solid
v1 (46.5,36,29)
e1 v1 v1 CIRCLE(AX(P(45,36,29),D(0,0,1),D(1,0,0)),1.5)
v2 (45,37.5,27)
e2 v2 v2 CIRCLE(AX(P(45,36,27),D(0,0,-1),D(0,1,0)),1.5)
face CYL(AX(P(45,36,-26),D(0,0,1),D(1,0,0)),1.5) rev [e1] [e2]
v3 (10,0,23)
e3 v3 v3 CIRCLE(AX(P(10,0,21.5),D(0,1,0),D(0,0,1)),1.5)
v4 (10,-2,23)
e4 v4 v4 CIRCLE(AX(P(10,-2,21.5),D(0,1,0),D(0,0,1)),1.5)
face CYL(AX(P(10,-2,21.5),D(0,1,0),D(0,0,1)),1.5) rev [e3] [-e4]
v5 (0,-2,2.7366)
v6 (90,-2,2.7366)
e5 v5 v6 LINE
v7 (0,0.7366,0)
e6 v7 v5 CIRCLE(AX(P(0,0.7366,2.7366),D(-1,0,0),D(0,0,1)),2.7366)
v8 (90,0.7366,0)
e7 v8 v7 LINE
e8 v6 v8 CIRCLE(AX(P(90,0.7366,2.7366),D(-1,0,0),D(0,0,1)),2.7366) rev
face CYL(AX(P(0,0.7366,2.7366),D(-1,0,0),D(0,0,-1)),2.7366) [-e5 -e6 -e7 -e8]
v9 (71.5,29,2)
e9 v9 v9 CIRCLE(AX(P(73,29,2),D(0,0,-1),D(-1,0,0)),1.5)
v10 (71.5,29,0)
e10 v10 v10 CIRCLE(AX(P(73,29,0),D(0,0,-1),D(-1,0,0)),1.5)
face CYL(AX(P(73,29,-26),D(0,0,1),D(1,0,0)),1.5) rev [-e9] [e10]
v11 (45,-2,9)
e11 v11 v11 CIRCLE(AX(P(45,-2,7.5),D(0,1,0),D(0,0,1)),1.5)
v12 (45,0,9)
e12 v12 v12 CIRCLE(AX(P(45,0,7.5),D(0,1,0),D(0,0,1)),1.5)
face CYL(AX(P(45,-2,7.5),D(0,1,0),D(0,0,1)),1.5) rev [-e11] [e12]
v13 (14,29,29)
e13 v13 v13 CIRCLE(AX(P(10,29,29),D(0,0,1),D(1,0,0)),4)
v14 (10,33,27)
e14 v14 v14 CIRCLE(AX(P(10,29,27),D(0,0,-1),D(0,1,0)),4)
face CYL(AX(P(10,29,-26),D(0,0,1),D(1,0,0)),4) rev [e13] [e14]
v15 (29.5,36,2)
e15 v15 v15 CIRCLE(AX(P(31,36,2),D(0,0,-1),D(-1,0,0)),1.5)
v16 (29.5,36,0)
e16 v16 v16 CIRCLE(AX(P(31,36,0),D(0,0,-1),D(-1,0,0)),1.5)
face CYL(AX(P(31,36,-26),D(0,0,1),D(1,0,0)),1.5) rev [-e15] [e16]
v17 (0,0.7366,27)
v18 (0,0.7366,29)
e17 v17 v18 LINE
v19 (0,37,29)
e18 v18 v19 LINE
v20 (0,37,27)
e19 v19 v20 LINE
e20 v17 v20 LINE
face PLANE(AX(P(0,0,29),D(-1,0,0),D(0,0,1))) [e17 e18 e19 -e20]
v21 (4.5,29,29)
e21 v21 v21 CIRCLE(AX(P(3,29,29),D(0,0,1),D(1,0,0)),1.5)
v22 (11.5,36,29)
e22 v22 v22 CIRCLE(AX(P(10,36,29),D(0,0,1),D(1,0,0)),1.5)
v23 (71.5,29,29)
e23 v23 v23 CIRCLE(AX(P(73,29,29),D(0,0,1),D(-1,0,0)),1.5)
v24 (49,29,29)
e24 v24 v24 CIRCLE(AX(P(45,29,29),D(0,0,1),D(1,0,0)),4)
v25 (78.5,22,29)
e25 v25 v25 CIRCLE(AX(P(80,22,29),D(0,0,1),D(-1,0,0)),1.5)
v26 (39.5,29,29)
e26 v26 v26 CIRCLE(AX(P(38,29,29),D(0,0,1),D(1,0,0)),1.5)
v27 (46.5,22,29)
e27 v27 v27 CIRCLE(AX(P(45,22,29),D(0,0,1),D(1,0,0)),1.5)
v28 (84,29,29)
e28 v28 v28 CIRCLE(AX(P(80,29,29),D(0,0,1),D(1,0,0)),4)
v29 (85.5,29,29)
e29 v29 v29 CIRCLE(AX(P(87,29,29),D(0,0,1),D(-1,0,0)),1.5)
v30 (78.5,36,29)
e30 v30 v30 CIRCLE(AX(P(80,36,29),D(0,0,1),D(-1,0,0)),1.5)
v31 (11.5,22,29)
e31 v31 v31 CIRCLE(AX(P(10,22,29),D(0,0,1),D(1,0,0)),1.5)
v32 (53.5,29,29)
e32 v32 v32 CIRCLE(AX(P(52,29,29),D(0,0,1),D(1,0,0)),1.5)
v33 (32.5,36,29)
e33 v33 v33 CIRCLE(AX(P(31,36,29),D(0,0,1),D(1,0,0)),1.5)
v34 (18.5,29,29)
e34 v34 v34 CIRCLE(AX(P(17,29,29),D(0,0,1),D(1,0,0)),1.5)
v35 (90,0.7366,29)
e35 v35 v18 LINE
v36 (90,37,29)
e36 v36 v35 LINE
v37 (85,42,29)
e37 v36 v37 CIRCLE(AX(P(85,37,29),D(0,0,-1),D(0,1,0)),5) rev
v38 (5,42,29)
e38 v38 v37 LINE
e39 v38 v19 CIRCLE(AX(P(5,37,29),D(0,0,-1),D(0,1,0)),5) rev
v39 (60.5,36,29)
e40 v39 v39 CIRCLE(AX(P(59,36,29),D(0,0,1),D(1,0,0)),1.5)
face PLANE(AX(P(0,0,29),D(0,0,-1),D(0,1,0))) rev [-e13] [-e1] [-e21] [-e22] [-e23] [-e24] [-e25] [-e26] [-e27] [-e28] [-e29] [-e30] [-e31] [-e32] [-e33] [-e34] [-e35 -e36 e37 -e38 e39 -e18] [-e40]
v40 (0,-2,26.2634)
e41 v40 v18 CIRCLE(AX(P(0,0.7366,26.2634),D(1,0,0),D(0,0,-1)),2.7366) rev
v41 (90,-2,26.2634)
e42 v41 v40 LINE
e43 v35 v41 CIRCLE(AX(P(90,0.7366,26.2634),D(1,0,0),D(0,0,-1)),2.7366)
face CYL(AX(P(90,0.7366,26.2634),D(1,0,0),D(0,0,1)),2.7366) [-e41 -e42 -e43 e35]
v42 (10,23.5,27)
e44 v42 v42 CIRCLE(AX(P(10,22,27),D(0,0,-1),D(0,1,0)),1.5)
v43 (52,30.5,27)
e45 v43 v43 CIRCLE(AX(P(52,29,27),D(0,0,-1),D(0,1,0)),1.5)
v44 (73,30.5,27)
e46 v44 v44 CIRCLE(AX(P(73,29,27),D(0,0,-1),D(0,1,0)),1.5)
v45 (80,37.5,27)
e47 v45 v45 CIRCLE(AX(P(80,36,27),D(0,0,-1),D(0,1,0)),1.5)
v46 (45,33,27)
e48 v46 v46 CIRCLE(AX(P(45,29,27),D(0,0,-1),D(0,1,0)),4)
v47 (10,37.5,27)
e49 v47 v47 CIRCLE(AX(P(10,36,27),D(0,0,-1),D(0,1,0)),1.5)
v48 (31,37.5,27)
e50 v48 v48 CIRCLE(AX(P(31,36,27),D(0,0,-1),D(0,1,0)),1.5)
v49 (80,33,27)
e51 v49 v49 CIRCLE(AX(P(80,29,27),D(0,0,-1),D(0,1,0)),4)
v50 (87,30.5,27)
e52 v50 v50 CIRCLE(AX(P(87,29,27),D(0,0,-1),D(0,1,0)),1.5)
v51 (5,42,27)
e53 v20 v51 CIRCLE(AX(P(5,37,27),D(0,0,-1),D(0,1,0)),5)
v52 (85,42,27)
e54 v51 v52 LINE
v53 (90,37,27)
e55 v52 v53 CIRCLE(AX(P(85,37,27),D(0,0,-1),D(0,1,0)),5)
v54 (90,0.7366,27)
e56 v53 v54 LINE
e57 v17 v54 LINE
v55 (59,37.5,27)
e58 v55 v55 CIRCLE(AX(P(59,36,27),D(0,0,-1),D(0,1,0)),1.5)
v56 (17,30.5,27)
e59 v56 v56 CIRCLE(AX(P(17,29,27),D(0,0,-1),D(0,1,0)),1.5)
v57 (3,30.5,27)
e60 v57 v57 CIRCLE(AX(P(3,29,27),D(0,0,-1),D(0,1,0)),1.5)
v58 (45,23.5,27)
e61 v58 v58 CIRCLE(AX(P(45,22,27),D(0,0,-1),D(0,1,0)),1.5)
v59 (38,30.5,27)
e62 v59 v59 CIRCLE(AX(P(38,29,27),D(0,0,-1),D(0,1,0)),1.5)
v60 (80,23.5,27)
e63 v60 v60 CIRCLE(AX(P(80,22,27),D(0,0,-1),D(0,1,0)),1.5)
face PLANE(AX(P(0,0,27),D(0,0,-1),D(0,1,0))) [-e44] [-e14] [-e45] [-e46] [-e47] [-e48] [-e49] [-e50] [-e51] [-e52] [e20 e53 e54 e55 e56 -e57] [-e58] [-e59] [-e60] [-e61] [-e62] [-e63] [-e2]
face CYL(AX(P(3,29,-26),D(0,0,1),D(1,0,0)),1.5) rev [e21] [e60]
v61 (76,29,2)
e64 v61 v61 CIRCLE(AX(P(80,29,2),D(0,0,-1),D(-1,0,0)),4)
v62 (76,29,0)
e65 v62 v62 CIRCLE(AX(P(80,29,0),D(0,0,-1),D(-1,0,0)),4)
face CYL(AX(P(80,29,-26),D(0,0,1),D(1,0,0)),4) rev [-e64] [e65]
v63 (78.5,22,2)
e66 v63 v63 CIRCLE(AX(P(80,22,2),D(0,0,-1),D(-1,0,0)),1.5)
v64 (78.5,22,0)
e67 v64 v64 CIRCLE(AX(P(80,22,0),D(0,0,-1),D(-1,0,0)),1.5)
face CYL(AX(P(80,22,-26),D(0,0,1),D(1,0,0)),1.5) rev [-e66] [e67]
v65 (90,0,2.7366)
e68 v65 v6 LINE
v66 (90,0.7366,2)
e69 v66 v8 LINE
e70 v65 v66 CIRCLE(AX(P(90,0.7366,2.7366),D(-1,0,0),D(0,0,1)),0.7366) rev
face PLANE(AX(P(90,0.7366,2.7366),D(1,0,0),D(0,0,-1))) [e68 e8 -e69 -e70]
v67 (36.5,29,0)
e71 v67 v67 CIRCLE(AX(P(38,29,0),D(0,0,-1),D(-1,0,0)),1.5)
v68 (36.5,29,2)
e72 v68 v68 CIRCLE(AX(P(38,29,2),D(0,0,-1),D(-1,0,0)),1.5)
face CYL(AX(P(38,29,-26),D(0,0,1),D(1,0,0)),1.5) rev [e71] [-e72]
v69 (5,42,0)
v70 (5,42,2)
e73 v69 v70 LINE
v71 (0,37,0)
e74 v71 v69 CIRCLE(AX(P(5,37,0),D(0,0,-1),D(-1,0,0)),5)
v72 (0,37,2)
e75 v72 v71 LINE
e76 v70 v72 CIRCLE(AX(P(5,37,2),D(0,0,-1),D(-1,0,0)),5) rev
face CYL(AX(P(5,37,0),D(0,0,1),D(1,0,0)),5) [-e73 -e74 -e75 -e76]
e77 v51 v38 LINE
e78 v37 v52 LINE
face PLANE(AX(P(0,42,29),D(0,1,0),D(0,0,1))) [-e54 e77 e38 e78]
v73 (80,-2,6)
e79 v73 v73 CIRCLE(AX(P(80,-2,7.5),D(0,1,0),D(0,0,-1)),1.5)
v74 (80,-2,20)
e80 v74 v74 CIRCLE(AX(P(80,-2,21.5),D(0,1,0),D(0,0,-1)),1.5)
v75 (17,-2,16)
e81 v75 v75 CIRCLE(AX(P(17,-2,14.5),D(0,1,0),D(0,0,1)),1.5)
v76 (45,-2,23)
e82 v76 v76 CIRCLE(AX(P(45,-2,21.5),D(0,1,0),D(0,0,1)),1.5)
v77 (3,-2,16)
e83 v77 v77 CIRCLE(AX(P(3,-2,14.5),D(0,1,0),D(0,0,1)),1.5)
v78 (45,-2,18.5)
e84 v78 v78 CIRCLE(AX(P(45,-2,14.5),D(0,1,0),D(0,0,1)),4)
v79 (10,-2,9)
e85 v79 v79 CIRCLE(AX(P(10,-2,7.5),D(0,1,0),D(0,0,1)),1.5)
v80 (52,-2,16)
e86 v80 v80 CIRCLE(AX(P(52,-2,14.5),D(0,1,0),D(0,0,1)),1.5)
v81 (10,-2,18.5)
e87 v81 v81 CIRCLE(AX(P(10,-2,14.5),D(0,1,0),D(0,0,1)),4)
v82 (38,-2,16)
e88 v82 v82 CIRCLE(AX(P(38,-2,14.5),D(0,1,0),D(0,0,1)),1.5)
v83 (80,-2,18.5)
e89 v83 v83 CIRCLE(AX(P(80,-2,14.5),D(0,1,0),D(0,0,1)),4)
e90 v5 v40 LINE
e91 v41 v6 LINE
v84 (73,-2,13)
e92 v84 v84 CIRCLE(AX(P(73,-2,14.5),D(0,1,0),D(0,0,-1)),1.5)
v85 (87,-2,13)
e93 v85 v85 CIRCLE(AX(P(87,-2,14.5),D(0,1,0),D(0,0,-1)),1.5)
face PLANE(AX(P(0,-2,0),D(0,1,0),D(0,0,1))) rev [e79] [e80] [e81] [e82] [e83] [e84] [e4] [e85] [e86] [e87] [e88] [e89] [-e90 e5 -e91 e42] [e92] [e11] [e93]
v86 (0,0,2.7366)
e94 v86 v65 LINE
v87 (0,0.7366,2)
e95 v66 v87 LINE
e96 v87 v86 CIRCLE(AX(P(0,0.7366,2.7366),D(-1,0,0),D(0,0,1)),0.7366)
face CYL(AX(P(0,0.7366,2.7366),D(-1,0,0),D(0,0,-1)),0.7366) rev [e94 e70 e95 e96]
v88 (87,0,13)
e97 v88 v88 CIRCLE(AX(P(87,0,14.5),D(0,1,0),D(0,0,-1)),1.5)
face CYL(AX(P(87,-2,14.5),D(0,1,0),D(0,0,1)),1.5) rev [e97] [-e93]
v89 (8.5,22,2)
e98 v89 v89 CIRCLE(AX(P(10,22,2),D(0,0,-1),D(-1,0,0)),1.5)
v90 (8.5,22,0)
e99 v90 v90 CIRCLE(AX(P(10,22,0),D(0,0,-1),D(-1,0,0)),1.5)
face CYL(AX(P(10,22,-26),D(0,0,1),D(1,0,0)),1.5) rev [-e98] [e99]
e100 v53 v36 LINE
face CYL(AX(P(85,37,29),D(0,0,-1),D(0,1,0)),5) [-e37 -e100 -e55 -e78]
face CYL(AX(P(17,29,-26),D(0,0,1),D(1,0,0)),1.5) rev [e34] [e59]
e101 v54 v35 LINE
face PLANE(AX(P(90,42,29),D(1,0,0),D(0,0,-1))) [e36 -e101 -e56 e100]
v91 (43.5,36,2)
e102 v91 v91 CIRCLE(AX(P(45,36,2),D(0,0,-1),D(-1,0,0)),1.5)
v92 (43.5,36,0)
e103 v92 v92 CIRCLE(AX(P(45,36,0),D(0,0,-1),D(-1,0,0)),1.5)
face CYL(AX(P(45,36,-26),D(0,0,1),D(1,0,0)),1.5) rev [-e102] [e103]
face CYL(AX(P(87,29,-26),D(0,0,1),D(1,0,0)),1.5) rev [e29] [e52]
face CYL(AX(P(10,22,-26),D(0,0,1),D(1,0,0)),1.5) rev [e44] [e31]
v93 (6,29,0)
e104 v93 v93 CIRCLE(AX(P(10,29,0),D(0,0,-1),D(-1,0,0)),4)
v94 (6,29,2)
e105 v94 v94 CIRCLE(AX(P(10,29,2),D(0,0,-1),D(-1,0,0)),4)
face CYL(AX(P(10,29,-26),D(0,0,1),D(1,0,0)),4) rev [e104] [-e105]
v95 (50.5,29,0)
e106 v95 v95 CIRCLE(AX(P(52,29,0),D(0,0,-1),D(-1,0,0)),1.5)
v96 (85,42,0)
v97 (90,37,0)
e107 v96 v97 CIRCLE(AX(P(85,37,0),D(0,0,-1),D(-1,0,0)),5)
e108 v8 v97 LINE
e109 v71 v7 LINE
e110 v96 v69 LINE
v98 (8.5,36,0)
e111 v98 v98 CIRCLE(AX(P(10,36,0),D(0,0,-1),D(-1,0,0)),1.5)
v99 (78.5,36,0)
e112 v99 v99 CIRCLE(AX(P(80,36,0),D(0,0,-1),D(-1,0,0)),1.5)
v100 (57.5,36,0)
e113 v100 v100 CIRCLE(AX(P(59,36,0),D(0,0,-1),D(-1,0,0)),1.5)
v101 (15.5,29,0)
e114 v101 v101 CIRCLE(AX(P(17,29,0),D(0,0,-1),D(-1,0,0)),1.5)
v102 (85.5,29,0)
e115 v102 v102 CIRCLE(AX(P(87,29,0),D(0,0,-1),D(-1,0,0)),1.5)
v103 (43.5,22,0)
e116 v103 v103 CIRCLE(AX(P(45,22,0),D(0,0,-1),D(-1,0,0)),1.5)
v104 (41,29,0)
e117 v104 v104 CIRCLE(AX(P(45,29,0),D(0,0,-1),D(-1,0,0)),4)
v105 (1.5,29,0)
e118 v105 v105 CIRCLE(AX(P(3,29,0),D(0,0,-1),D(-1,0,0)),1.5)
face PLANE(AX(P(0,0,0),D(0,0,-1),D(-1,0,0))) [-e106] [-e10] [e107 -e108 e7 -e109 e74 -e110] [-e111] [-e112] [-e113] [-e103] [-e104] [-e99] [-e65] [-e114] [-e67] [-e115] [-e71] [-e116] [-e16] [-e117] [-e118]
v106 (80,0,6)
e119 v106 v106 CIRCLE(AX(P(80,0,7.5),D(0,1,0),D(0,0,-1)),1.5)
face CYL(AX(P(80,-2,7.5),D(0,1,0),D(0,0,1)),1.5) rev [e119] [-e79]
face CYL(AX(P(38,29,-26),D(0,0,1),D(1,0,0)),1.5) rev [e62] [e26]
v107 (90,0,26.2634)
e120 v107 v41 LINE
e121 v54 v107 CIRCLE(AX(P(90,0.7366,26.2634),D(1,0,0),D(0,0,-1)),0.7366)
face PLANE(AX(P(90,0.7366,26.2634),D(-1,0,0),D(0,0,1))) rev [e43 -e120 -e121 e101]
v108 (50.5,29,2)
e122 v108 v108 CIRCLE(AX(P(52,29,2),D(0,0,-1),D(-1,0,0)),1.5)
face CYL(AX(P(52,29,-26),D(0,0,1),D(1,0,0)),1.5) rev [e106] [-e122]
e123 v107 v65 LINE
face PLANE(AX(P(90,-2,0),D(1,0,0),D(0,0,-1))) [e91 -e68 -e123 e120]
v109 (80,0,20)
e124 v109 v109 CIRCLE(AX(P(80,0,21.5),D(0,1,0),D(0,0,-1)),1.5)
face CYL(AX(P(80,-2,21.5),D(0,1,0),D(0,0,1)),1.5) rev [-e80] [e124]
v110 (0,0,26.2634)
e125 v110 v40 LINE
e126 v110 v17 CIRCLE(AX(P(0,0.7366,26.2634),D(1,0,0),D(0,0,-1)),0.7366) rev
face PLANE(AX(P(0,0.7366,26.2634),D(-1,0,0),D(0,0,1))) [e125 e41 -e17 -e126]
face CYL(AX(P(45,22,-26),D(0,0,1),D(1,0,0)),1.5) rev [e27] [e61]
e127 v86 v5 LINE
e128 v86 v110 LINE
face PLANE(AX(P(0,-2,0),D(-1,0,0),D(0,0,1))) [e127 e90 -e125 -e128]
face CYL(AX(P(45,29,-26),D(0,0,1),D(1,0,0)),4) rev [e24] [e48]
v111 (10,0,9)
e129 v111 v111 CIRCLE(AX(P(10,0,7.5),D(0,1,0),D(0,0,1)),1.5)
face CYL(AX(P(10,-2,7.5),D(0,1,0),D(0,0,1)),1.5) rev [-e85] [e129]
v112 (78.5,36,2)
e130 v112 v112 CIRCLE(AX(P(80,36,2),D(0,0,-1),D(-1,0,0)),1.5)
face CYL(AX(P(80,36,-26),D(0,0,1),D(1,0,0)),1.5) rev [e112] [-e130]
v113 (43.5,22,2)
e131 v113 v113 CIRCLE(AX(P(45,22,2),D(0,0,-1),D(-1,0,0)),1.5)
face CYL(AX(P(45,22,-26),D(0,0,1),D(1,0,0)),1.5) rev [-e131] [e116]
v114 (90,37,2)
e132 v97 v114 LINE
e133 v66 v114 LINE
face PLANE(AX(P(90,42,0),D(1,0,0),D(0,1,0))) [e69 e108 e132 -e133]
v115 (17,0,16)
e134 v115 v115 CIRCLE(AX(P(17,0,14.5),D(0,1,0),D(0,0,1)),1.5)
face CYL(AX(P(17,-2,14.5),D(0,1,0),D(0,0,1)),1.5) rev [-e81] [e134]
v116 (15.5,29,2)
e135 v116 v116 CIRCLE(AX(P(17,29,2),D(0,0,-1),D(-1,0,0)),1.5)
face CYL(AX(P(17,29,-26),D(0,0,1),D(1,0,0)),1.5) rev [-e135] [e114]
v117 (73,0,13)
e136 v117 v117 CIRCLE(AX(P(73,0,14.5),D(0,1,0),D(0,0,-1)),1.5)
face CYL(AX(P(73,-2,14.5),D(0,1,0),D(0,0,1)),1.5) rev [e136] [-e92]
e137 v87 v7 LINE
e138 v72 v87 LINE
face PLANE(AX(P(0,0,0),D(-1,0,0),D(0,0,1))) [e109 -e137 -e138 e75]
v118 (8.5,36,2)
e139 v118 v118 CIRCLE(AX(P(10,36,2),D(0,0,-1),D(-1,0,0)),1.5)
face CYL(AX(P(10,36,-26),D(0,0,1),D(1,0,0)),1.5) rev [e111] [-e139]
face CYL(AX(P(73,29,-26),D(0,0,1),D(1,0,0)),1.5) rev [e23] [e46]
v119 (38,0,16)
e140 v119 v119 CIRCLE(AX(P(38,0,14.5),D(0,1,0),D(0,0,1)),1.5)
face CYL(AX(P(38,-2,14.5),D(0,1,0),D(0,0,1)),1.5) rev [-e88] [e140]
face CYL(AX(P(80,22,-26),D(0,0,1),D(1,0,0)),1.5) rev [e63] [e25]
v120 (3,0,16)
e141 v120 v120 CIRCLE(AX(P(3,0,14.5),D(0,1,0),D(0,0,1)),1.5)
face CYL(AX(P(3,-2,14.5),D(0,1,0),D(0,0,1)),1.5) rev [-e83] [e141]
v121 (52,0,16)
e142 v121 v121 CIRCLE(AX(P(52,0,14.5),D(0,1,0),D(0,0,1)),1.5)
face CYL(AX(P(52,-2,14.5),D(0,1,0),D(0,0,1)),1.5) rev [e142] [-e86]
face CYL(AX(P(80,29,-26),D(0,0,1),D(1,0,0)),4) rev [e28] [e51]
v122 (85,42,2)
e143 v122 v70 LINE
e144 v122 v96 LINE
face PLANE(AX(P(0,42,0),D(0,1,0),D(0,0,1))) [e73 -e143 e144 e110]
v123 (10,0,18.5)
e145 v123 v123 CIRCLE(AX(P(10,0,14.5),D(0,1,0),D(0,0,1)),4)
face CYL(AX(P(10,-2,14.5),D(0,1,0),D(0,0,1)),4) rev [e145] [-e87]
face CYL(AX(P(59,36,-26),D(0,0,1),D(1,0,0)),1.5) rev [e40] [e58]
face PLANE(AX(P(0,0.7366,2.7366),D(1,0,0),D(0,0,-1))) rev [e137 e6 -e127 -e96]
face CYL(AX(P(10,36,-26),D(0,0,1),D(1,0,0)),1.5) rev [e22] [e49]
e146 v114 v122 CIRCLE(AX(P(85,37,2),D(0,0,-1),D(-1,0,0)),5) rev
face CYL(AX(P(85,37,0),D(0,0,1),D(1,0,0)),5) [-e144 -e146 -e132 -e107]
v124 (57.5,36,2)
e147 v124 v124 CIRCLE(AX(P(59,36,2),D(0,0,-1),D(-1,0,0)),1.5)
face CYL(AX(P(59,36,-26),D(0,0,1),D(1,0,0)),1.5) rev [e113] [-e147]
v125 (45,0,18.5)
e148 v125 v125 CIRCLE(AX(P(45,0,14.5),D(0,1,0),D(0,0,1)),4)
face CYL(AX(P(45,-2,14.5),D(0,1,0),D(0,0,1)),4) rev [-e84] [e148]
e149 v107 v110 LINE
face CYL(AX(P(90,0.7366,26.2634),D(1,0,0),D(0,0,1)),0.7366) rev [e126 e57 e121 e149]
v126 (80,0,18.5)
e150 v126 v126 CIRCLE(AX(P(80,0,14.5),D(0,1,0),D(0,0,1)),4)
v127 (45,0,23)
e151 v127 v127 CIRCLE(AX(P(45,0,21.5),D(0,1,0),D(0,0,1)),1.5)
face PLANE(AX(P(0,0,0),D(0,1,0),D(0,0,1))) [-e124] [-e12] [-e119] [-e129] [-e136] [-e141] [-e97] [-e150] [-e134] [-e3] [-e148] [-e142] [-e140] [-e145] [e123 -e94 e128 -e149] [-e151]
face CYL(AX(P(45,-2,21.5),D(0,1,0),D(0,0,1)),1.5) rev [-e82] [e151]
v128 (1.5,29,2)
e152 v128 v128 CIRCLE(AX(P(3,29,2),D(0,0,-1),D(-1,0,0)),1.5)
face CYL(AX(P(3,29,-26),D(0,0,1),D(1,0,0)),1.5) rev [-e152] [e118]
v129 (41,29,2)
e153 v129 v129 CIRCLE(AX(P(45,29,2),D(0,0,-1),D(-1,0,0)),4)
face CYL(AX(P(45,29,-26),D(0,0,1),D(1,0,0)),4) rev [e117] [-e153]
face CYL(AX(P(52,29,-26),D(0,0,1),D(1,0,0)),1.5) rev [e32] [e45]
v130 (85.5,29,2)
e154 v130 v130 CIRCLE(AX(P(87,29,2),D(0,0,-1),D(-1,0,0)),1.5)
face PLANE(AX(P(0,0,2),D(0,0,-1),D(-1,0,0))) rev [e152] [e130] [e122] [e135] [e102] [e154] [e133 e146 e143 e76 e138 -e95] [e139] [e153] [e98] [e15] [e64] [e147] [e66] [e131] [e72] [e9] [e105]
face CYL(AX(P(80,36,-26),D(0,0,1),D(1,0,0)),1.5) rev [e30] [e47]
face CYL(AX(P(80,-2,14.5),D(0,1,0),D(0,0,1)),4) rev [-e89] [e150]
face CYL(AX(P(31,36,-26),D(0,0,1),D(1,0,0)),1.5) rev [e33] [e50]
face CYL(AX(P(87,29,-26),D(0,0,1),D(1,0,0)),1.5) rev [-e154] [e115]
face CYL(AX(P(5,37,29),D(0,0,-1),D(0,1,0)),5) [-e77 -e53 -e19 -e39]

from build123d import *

# Parameters (mm, degrees)
SKETCH_1_W                         = 90
SKETCH_1_H                         = 29
SKETCH_1_R                         = 4
SKETCH_1_R_2                       = 1.5
SM_BASE_FLANGE_1_DEPTH             = 2
SM_EDGE_FLANGE_1_STRIP_W           = 9.4732
SM_EDGE_FLANGE_1_STRIP_H           = 2
SM_EDGE_FLANGE_1_STRIP_CUT_DEPTH   = 90
SM_EDGE_FLANGE_1_STRIP_2_W         = 9.4732
SM_EDGE_FLANGE_1_STRIP_2_H         = 2
SM_EDGE_FLANGE_1_STRIP_CUT_2_DEPTH = 90
SM_EDGE_FLANGE_1_DEPTH             = 90
SM_EDGE_FLANGE_1_BEND_DEPTH        = 90
SKETCH_12_R                        = 4
SKETCH_12_R_2                      = 1.5
CUT_EXTRUDE_1_DEPTH                = 55
FILLET_1_R                         = 5


# Sheet-metal steps are written as plain solids
with BuildPart() as part:
    # Sketch 1 → 基体-法兰1 (new body)
    with BuildSketch(Plane(origin=(0, 0, 0), x_dir=(1, 0, 0), z_dir=(0, 1, 0))):
        with Locations((45, -14.5)):
            Rectangle(SKETCH_1_W, SKETCH_1_H)
        with Locations(Location((45, -14.5, 0), (0, 0, 270))):
            Circle(SKETCH_1_R, mode=Mode.SUBTRACT)
        with Locations(Location((10, -14.5, 0), (0, 0, 270))):
            Circle(SKETCH_1_R, mode=Mode.SUBTRACT)
        with Locations(Location((80, -14.5, 0), (0, 0, 270))):
            Circle(SKETCH_1_R, mode=Mode.SUBTRACT)
        with Locations(Location((10, -7.5, 0), (0, 0, 270))):
            Circle(SKETCH_1_R_2, mode=Mode.SUBTRACT)
        with Locations(Location((10, -21.5, 0), (0, 0, 270))):
            Circle(SKETCH_1_R_2, mode=Mode.SUBTRACT)
        with Locations(Location((17, -14.5, 0), (0, 0, 270))):
            Circle(SKETCH_1_R_2, mode=Mode.SUBTRACT)
        with Locations(Location((3, -14.5, 0), (0, 0, 270))):
            Circle(SKETCH_1_R_2, mode=Mode.SUBTRACT)
        with Locations(Location((45, -7.5, 0), (0, 0, 270))):
            Circle(SKETCH_1_R_2, mode=Mode.SUBTRACT)
        with Locations(Location((45, -21.5, 0), (0, 0, 270))):
            Circle(SKETCH_1_R_2, mode=Mode.SUBTRACT)
        with Locations(Location((52, -14.5, 0), (0, 0, 270))):
            Circle(SKETCH_1_R_2, mode=Mode.SUBTRACT)
        with Locations(Location((38, -14.5, 0), (0, 0, 270))):
            Circle(SKETCH_1_R_2, mode=Mode.SUBTRACT)
        with Locations(Location((87, -14.5, 0), (0, 0, 90))):
            Circle(SKETCH_1_R_2, mode=Mode.SUBTRACT)
        with Locations(Location((80, -21.5, 0), (0, 0, 90))):
            Circle(SKETCH_1_R_2, mode=Mode.SUBTRACT)
        with Locations(Location((73, -14.5, 0), (0, 0, 90))):
            Circle(SKETCH_1_R_2, mode=Mode.SUBTRACT)
        with Locations(Location((80, -7.5, 0), (0, 0, 90))):
            Circle(SKETCH_1_R_2, mode=Mode.SUBTRACT)
    extrude(amount=-SM_BASE_FLANGE_1_DEPTH)

    # 边线-法兰1 strip (across the edge) → 边线-法兰1 strip cut (cut)
    with BuildSketch(Plane.ZY.offset(-90)):
        with Locations((-2, -1)):
            Rectangle(SM_EDGE_FLANGE_1_STRIP_W, SM_EDGE_FLANGE_1_STRIP_H)
    extrude(amount=SM_EDGE_FLANGE_1_STRIP_CUT_DEPTH, mode=Mode.SUBTRACT)

    # 边线-法兰1 strip 2 (across the edge) → 边线-法兰1 strip cut 2 (cut)
    with BuildSketch(Plane(origin=(0, 0, 29), x_dir=(0, 0, -1), z_dir=(1, 0, 0))):
        with Locations((-2, -1)):
            Rectangle(SM_EDGE_FLANGE_1_STRIP_2_W, SM_EDGE_FLANGE_1_STRIP_2_H)
    extrude(amount=SM_EDGE_FLANGE_1_STRIP_CUT_2_DEPTH, mode=Mode.SUBTRACT)

    # 边线-法兰1 section (across the edge) → 边线-法兰1 (add)
    with BuildSketch(Plane.ZY.offset(-90)):
        with BuildLine():
            Line((0, 0.7366), (0, 42))
            Line((0, 42), (2, 42))
            Line((2, 42), (2, 0.7366))
            ThreePointArc((2, 0.7366), (2.215745145, 0.215745145), (2.7366, 0))
            Line((2.7366, 0), (2.7366, -2))
            ThreePointArc((2.7366, -2), (0.801531583, -1.198468417), (0, 0.7366))
        make_face()
    extrude(amount=SM_EDGE_FLANGE_1_DEPTH)

    # 边线-法兰1 section 2 (across the edge) → 边线-法兰1 bend (add)
    with BuildSketch(Plane(origin=(0, 0, 29), x_dir=(0, 0, -1), z_dir=(1, 0, 0))):
        with BuildLine():
            Line((0, 0.7366), (0, 42))
            Line((0, 42), (2, 42))
            Line((2, 42), (2, 0.7366))
            ThreePointArc((2, 0.7366), (2.215745145, 0.215745145), (2.7366, 0))
            Line((2.7366, 0), (2.7366, -2))
            ThreePointArc((2.7366, -2), (0.801531583, -1.198468417), (0, 0.7366))
        make_face()
    extrude(amount=SM_EDGE_FLANGE_1_BEND_DEPTH)

    # 草图12 → 切除-拉伸1 (cut)
    with BuildSketch(Plane.XY.offset(29)):
        with Locations((45, 29)):
            Circle(SKETCH_12_R)
        with Locations((80, 29)):
            Circle(SKETCH_12_R)
        with Locations((10, 29)):
            Circle(SKETCH_12_R)
        with Locations((10, 36)):
            Circle(SKETCH_12_R_2)
        with Locations((10, 22)):
            Circle(SKETCH_12_R_2)
        with Locations((17, 29)):
            Circle(SKETCH_12_R_2)
        with Locations((3, 29)):
            Circle(SKETCH_12_R_2)
        with Locations((45, 36)):
            Circle(SKETCH_12_R_2)
        with Locations((45, 22)):
            Circle(SKETCH_12_R_2)
        with Locations((52, 29)):
            Circle(SKETCH_12_R_2)
        with Locations((38, 29)):
            Circle(SKETCH_12_R_2)
        with Locations(Location((87, 29, 0), (0, 0, 90))):
            Circle(SKETCH_12_R_2)
        with Locations(Location((80, 36, 0), (0, 0, 90))):
            Circle(SKETCH_12_R_2)
        with Locations(Location((73, 29, 0), (0, 0, 90))):
            Circle(SKETCH_12_R_2)
        with Locations(Location((80, 22, 0), (0, 0, 90))):
            Circle(SKETCH_12_R_2)
        with Locations((31, 36)):
            Circle(SKETCH_12_R_2)
        with Locations((59, 36)):
            Circle(SKETCH_12_R_2)
    extrude(amount=-CUT_EXTRUDE_1_DEPTH, mode=Mode.SUBTRACT)

    # 圆角1
    fillet_1_edges = [part.edges().sort_by_distance(p)[0] for p in [
        (90, 42, 1),
        (0, 42, 1),
        (0, 42, 28),
        (90, 42, 28),
    ]]
    fillet(fillet_1_edges, radius=FILLET_1_R)


solid = part.part
